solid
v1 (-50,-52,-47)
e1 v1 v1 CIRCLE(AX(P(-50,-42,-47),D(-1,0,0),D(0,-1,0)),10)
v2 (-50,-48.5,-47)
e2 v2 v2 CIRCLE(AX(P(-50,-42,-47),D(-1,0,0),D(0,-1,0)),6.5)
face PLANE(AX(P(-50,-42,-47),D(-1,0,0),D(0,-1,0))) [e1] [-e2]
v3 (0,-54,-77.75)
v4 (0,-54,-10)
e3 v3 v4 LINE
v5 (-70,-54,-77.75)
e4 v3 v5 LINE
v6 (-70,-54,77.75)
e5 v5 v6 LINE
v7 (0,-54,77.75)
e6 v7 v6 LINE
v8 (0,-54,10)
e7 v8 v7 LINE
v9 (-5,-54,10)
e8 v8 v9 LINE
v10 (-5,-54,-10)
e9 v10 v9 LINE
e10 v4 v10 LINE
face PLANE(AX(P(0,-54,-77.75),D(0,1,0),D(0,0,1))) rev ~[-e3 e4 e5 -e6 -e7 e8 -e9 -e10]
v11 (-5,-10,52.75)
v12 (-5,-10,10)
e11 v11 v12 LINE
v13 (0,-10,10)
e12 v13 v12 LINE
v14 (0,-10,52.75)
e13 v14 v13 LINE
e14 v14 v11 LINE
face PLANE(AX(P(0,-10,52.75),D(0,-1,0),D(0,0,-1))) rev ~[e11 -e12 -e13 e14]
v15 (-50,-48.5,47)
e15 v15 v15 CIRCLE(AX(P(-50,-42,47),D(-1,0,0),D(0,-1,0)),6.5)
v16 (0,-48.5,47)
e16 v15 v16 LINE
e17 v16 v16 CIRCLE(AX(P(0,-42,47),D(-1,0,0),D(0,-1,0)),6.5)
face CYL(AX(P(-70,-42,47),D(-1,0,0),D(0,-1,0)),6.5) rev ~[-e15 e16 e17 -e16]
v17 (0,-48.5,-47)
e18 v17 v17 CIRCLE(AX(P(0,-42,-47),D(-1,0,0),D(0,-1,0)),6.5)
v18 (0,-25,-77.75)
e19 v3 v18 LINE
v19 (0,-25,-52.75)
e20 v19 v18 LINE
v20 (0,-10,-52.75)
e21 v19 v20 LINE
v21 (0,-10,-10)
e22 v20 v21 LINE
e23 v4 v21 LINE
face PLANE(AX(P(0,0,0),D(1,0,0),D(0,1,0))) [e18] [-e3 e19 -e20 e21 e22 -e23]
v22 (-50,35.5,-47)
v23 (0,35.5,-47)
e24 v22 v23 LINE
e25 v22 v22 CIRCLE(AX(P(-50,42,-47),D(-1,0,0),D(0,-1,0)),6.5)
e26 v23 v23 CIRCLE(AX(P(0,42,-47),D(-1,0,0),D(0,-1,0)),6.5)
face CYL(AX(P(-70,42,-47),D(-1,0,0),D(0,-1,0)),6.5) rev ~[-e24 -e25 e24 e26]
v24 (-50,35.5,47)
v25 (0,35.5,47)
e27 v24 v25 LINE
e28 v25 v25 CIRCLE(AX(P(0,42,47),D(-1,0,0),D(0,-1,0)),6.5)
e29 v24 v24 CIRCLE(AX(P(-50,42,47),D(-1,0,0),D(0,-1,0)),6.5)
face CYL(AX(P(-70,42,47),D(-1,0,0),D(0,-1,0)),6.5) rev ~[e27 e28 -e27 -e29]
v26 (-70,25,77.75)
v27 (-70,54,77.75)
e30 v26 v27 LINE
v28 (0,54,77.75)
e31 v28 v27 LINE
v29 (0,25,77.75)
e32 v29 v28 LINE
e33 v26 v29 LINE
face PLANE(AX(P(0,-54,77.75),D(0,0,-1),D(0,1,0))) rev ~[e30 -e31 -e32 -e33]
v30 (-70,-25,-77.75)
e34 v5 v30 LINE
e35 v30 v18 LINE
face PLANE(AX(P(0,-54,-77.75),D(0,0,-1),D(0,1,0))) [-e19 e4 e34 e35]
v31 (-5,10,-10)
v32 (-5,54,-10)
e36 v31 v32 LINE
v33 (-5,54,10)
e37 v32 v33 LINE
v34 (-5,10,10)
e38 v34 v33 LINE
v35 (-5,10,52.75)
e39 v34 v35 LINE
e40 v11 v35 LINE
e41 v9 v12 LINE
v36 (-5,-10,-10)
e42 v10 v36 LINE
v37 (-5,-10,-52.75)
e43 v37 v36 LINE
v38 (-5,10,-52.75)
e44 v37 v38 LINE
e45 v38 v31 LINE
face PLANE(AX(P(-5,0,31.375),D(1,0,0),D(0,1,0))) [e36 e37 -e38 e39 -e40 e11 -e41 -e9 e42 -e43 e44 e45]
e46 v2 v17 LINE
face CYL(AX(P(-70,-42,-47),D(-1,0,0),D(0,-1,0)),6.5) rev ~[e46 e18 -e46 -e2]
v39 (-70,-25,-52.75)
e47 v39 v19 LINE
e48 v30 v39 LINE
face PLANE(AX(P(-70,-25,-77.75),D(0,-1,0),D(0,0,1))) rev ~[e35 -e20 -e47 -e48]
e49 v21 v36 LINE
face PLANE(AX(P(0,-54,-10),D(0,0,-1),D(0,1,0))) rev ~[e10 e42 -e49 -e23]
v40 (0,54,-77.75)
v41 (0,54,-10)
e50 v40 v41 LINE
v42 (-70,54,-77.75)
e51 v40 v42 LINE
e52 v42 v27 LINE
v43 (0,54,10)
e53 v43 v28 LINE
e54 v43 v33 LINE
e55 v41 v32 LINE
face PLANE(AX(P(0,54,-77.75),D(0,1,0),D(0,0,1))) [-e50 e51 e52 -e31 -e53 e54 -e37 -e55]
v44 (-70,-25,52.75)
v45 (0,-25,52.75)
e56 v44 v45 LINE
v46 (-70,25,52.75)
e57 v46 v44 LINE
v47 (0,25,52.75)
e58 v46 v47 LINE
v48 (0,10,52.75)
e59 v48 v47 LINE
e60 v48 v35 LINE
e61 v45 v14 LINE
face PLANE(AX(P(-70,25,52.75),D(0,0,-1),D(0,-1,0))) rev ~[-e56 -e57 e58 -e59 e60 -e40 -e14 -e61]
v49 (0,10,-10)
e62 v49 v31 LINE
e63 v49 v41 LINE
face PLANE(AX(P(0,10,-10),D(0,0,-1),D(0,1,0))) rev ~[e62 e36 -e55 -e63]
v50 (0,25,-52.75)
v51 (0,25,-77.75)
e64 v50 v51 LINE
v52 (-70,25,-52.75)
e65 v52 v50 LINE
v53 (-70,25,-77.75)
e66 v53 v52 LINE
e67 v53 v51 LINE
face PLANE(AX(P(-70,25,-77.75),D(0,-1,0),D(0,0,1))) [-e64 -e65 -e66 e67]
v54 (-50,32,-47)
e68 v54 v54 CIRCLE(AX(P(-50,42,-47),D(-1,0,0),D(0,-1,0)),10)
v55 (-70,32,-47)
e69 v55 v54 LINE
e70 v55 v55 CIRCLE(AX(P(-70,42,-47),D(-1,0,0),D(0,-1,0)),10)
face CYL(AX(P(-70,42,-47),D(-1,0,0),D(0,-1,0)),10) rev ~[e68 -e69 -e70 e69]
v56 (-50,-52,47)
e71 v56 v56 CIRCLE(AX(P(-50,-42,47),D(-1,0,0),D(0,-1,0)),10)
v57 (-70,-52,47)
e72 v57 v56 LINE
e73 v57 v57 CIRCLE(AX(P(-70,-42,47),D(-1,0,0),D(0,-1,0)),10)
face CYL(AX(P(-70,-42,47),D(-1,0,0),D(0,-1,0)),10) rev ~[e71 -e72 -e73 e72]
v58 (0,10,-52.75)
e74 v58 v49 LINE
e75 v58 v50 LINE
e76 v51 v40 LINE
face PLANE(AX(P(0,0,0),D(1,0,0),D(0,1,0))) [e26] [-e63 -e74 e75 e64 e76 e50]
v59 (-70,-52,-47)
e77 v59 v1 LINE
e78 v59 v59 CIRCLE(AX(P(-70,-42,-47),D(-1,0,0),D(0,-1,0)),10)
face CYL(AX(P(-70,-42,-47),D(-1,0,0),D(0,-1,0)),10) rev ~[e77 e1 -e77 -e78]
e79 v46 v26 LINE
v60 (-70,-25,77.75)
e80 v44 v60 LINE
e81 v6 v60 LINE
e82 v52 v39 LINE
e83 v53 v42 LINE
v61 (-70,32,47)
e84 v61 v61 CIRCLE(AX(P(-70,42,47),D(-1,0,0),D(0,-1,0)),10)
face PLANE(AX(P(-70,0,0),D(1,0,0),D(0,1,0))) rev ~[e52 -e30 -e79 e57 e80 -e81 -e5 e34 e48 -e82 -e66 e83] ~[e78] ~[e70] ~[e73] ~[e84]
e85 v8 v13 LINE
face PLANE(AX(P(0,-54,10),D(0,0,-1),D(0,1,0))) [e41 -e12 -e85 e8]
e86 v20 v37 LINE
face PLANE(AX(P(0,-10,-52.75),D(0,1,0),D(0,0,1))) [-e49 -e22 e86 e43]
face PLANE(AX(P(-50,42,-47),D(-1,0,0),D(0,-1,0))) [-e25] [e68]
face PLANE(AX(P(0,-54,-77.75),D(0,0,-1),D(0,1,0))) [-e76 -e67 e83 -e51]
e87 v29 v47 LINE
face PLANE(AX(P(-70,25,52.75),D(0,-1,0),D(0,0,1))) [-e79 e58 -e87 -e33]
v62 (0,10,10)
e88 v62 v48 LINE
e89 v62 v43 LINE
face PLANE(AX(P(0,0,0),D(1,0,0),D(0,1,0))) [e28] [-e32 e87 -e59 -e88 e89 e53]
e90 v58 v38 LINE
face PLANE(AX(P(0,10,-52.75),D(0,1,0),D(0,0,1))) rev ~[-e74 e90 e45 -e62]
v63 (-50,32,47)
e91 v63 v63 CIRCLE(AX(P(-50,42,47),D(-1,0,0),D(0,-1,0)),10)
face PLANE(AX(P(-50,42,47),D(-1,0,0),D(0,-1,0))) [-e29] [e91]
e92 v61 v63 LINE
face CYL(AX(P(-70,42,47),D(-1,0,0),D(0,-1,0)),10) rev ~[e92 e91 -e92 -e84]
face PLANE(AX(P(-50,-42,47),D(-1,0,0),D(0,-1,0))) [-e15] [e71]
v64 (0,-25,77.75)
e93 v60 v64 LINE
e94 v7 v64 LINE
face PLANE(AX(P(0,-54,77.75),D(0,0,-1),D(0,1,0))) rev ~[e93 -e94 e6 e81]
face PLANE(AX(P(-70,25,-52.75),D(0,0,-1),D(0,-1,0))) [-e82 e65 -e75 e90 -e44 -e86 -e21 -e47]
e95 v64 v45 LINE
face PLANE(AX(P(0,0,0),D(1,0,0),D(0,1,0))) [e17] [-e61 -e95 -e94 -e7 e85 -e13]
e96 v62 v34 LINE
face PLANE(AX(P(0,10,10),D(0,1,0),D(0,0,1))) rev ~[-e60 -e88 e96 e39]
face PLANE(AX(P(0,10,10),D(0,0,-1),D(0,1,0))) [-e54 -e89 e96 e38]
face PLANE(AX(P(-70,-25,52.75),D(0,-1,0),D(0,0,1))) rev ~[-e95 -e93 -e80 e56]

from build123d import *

# Parameters (mm, degrees)
F0_W     = 108
F0_H     = 155.5
F1_DEPTH = 70
F2_R     = 6.5
F3_DEPTH = 70.001
F4_W     = 50
F4_H     = 25
F5_DEPTH = 70.001
F6_R     = 10
F7_DEPTH = 20
F8_W     = 20
F8_H     = 42.75
F8_H_2   = 20
F8_W_2   = 44
F9_DEPTH = 5


with BuildPart() as f1:
    # F0 (on Right) → F1 (new body)
    with BuildSketch(Plane.YZ):
        Rectangle(F0_W, F0_H)
    extrude(amount=-F1_DEPTH)

    # F2 (on face) → F3 (cut, through all)
    with BuildSketch(Plane(origin=(-70, 0, 0), x_dir=(0, -1, 0), z_dir=(-1, 0, 0))):
        with Locations((-42, 47)):
            Circle(F2_R)
        with Locations((42, 47)):
            Circle(F2_R)
        with Locations((-42, -47)):
            Circle(F2_R)
        with Locations((42, -47)):
            Circle(F2_R)
    extrude(amount=-F3_DEPTH, mode=Mode.SUBTRACT)

    # F4 (on face) → F5 (cut, through all)
    with BuildSketch(Plane(origin=(-70, 0, 0), x_dir=(0, -1, 0), z_dir=(-1, 0, 0))):
        with Locations((0, 65.25)):
            Rectangle(F4_W, F4_H)
        with Locations((0, -65.25)):
            Rectangle(F4_W, F4_H)
    extrude(amount=-F5_DEPTH, mode=Mode.SUBTRACT)

    # F6 (on face) → F7 (cut)
    with BuildSketch(Plane(origin=(-70, 0, 0), x_dir=(0, -1, 0), z_dir=(-1, 0, 0))):
        with Locations((-42, 47)):
            Circle(F6_R)
        with Locations((-42, -47)):
            Circle(F6_R)
        with Locations((42, 47)):
            Circle(F6_R)
        with Locations((42, -47)):
            Circle(F6_R)
    extrude(amount=-F7_DEPTH, mode=Mode.SUBTRACT)

    # F8 (on face) → F9 (cut)
    with BuildSketch(Plane.YZ):
        with Locations((0, 31.375)):
            Rectangle(F8_W, F8_H)
        Rectangle(F8_W, F8_H_2)
        with Locations((-32, 0)):
            Rectangle(F8_W_2, F8_H_2)
        with Locations((32, 0)):
            Rectangle(F8_W_2, F8_H_2)
        with Locations((0, -31.375)):
            Rectangle(F8_W, F8_H)
    extrude(amount=-F9_DEPTH, mode=Mode.SUBTRACT)


solid = f1.part
